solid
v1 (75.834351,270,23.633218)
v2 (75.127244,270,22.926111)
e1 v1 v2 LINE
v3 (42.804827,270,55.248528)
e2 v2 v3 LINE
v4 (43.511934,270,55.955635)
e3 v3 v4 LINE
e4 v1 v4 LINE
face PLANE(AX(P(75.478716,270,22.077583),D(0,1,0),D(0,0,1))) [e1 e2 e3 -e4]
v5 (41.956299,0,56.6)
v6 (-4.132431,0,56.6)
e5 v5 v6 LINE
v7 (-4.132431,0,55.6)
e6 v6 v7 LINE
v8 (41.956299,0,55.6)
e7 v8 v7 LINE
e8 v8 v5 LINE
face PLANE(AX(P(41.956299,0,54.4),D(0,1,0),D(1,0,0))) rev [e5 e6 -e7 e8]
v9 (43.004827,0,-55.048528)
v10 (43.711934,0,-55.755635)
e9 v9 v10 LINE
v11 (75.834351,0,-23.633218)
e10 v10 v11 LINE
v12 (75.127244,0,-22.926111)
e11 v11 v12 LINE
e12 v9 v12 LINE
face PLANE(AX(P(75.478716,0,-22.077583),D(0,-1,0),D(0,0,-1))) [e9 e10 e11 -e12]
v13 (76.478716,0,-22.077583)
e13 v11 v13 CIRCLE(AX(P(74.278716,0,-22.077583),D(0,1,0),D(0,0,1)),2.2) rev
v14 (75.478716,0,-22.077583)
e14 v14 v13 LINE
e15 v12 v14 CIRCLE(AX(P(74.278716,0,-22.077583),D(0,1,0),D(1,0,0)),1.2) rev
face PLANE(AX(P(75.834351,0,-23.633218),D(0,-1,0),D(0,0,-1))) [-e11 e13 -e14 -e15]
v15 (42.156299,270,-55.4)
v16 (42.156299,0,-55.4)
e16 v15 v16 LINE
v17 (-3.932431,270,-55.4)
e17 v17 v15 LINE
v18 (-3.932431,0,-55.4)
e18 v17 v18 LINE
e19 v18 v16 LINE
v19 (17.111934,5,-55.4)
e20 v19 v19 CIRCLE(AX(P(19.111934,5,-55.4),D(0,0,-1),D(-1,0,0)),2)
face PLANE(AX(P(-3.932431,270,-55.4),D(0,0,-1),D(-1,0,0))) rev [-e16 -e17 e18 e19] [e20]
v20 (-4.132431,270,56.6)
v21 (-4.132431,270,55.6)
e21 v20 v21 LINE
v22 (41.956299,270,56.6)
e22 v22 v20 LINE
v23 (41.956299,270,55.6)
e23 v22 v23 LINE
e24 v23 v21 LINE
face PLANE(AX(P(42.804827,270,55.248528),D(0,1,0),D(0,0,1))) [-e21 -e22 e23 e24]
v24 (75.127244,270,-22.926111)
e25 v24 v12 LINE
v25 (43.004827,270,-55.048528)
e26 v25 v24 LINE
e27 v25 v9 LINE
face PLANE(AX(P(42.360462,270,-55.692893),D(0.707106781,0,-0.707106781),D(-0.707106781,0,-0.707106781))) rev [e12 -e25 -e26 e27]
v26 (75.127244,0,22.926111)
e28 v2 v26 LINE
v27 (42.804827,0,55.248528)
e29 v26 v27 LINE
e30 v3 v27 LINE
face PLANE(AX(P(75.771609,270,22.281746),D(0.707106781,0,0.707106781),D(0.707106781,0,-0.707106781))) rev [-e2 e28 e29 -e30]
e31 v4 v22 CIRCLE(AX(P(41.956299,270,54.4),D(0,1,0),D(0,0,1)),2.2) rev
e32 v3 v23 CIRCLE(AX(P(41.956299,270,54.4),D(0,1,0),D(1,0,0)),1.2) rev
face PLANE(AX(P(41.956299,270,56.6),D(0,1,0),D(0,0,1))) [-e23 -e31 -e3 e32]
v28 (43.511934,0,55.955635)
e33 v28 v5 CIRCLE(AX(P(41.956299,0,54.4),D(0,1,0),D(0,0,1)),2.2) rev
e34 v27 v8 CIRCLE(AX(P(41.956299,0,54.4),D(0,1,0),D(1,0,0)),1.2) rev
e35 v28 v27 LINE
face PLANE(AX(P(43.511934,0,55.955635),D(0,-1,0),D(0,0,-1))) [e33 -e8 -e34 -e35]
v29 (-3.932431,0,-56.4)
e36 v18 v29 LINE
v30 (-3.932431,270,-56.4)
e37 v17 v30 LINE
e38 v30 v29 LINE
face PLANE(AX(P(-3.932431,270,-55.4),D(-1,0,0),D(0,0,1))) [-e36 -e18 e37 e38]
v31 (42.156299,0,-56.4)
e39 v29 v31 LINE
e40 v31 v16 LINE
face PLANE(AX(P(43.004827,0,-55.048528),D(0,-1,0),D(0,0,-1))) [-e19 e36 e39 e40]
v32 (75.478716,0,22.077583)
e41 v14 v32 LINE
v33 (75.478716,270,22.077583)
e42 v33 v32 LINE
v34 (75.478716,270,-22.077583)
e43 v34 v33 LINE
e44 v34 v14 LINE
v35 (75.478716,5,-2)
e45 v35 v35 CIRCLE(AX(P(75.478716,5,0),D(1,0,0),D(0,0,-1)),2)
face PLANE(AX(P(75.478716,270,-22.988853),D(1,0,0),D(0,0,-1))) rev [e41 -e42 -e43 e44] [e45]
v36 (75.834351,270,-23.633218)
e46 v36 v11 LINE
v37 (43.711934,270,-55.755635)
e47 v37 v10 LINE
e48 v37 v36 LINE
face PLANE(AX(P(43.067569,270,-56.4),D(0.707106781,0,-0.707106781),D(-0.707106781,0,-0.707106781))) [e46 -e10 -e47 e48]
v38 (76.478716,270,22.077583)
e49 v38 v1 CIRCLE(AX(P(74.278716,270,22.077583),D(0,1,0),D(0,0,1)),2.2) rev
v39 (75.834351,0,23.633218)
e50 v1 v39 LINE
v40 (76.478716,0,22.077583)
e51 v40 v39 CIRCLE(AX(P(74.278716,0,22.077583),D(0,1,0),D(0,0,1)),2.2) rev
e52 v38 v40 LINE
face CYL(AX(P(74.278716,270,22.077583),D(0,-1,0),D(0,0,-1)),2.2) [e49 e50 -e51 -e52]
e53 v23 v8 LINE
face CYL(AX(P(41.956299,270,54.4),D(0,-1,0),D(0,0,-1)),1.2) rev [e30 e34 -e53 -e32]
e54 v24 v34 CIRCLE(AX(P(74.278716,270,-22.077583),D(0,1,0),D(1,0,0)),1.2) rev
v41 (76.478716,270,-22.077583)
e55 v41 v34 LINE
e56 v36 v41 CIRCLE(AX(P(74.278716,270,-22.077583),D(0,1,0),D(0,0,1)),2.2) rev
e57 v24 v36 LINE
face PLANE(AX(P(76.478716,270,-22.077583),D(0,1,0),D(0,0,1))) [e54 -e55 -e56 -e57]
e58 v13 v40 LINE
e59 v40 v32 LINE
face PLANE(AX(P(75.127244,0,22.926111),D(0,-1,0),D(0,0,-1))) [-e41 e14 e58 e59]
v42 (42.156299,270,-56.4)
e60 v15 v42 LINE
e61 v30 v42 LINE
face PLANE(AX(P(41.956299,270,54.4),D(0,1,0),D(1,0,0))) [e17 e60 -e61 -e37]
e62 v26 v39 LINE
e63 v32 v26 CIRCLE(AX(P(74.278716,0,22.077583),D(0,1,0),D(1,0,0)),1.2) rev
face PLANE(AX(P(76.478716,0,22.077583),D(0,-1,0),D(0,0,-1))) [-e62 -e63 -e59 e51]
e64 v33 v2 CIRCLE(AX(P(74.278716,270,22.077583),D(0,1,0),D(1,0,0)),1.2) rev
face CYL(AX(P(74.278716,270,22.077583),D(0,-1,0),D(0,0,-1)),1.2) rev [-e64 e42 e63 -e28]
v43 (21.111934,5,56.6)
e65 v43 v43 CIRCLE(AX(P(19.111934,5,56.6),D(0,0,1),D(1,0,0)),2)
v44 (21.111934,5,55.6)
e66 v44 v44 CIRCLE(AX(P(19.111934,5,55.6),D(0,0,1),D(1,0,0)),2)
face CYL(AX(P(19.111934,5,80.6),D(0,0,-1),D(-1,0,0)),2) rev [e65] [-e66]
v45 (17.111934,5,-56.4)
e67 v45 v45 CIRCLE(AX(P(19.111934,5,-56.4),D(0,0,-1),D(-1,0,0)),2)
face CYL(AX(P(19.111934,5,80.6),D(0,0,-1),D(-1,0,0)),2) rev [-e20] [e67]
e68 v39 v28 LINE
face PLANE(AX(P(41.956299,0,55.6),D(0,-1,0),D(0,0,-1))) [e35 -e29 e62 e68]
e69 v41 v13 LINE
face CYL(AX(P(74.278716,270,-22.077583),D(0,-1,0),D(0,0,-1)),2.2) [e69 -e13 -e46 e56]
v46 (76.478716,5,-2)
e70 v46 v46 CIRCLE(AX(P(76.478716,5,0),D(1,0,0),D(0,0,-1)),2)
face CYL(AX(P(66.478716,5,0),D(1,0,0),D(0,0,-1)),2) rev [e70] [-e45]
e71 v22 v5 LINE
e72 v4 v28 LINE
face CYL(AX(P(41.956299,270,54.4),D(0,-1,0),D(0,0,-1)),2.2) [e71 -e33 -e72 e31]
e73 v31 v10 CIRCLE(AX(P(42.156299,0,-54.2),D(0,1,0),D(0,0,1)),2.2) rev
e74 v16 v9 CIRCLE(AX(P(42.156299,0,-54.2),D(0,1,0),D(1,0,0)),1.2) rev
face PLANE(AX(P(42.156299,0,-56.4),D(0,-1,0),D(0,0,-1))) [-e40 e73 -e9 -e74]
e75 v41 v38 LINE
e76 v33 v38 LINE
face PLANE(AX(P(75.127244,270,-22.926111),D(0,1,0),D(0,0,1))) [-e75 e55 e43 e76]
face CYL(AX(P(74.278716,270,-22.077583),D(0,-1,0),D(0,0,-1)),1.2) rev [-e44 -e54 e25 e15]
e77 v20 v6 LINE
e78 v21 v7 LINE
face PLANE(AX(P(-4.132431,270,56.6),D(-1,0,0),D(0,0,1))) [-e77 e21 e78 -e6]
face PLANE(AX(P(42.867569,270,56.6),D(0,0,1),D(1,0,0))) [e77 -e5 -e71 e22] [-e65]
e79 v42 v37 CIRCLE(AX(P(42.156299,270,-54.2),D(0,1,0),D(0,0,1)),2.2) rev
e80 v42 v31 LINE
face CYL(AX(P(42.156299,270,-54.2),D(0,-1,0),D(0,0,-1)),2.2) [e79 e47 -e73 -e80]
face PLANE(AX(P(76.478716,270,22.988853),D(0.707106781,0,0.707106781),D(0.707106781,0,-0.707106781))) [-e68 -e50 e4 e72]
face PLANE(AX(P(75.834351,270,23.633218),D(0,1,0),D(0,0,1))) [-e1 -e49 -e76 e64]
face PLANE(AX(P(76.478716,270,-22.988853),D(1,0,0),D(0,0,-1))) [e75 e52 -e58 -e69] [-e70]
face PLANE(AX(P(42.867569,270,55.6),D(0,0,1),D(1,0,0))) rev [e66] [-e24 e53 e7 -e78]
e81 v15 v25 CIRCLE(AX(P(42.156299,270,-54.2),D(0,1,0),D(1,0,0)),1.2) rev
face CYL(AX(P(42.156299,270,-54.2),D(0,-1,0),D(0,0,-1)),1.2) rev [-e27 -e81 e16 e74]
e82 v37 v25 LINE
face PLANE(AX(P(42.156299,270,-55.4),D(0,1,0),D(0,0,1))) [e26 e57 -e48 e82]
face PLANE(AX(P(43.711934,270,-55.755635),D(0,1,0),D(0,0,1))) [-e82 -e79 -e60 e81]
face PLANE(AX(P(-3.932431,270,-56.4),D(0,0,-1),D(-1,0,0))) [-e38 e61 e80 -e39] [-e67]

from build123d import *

# Parameters (mm, degrees)
SM_BASE_FLANGE_1_DEPTH = 270
SKETCH_2_R             = 2
CUT_EXTRUDE_1_DEPTH    = 137
SKETCH_3_R             = 2
CUT_EXTRUDE_2_DEPTH    = 10


# Sheet-metal steps are written as plain solids
with BuildPart() as part:
    # Sketch 1 → Базовая кромка1 (new body)
    with BuildSketch(Plane(origin=(0, 0, 0), x_dir=(1, 0, 0), z_dir=(0, 1, 0))):
        with BuildLine():
            Line((-3.932431311, 56.4), (42.156298852, 56.4))
            ThreePointArc((42.156298852, 56.4), (42.998202403, 56.232534972), (43.71193377, 55.755634919))
            Line((43.71193377, 55.755634919), (75.834350896, 23.633217793))
            ThreePointArc((75.834350896, 23.633217793), (76.311250949, 22.919486426), (76.478715977, 22.077582874))
            Line((76.478715977, 22.077582874), (76.478715977, -22.077582874))
            ThreePointArc((76.478715977, -22.077582874), (76.311250949, -22.919486426), (75.834350896, -23.633217793))
            Line((75.834350896, -23.633217793), (43.51193377, -55.955634919))
            ThreePointArc((43.51193377, -55.955634919), (42.798202403, -56.432534972), (41.956298852, -56.6))
            Line((41.956298852, -56.6), (-4.132431311, -56.6))
            Line((-4.132431311, -56.6), (-4.132431311, -55.6))
            Line((-4.132431311, -55.6), (41.956298852, -55.6))
            ThreePointArc((41.956298852, -55.6), (42.41551897, -55.508655439), (42.804826989, -55.248528137))
            Line((42.804826989, -55.248528137), (75.127244115, -22.926111012))
            ThreePointArc((75.127244115, -22.926111012), (75.387371416, -22.536802993), (75.478715977, -22.077582874))
            Line((75.478715977, -22.077582874), (75.478715977, 22.077582874))
            ThreePointArc((75.478715977, 22.077582874), (75.387371416, 22.536802993), (75.127244115, 22.926111012))
            Line((75.127244115, 22.926111012), (43.004826989, 55.048528137))
            ThreePointArc((43.004826989, 55.048528137), (42.61551897, 55.308655439), (42.156298852, 55.4))
            Line((42.156298852, 55.4), (-3.932431311, 55.4))
            Line((-3.932431311, 55.4), (-3.932431311, 56.4))
        make_face()
    extrude(amount=SM_BASE_FLANGE_1_DEPTH)

    # Эскиз2 → Вырез-Вытянуть1 (cut)
    with BuildSketch(Plane(origin=(0, 0, -56.4), x_dir=(-1, 0, 0), z_dir=(0, 0, -1))):
        with Locations((-19.11193377, 5)):
            Circle(SKETCH_2_R)
    extrude(amount=-CUT_EXTRUDE_1_DEPTH, mode=Mode.SUBTRACT)

    # Эскиз3 → Вырез-Вытянуть2 (cut)
    with BuildSketch(Plane(origin=(76.478715977, 0, 0), x_dir=(0, 0, -1), z_dir=(1, 0, 0))):
        with Locations((0, 5)):
            Circle(SKETCH_3_R)
    extrude(amount=-CUT_EXTRUDE_2_DEPTH, mode=Mode.SUBTRACT)


solid = part.part
